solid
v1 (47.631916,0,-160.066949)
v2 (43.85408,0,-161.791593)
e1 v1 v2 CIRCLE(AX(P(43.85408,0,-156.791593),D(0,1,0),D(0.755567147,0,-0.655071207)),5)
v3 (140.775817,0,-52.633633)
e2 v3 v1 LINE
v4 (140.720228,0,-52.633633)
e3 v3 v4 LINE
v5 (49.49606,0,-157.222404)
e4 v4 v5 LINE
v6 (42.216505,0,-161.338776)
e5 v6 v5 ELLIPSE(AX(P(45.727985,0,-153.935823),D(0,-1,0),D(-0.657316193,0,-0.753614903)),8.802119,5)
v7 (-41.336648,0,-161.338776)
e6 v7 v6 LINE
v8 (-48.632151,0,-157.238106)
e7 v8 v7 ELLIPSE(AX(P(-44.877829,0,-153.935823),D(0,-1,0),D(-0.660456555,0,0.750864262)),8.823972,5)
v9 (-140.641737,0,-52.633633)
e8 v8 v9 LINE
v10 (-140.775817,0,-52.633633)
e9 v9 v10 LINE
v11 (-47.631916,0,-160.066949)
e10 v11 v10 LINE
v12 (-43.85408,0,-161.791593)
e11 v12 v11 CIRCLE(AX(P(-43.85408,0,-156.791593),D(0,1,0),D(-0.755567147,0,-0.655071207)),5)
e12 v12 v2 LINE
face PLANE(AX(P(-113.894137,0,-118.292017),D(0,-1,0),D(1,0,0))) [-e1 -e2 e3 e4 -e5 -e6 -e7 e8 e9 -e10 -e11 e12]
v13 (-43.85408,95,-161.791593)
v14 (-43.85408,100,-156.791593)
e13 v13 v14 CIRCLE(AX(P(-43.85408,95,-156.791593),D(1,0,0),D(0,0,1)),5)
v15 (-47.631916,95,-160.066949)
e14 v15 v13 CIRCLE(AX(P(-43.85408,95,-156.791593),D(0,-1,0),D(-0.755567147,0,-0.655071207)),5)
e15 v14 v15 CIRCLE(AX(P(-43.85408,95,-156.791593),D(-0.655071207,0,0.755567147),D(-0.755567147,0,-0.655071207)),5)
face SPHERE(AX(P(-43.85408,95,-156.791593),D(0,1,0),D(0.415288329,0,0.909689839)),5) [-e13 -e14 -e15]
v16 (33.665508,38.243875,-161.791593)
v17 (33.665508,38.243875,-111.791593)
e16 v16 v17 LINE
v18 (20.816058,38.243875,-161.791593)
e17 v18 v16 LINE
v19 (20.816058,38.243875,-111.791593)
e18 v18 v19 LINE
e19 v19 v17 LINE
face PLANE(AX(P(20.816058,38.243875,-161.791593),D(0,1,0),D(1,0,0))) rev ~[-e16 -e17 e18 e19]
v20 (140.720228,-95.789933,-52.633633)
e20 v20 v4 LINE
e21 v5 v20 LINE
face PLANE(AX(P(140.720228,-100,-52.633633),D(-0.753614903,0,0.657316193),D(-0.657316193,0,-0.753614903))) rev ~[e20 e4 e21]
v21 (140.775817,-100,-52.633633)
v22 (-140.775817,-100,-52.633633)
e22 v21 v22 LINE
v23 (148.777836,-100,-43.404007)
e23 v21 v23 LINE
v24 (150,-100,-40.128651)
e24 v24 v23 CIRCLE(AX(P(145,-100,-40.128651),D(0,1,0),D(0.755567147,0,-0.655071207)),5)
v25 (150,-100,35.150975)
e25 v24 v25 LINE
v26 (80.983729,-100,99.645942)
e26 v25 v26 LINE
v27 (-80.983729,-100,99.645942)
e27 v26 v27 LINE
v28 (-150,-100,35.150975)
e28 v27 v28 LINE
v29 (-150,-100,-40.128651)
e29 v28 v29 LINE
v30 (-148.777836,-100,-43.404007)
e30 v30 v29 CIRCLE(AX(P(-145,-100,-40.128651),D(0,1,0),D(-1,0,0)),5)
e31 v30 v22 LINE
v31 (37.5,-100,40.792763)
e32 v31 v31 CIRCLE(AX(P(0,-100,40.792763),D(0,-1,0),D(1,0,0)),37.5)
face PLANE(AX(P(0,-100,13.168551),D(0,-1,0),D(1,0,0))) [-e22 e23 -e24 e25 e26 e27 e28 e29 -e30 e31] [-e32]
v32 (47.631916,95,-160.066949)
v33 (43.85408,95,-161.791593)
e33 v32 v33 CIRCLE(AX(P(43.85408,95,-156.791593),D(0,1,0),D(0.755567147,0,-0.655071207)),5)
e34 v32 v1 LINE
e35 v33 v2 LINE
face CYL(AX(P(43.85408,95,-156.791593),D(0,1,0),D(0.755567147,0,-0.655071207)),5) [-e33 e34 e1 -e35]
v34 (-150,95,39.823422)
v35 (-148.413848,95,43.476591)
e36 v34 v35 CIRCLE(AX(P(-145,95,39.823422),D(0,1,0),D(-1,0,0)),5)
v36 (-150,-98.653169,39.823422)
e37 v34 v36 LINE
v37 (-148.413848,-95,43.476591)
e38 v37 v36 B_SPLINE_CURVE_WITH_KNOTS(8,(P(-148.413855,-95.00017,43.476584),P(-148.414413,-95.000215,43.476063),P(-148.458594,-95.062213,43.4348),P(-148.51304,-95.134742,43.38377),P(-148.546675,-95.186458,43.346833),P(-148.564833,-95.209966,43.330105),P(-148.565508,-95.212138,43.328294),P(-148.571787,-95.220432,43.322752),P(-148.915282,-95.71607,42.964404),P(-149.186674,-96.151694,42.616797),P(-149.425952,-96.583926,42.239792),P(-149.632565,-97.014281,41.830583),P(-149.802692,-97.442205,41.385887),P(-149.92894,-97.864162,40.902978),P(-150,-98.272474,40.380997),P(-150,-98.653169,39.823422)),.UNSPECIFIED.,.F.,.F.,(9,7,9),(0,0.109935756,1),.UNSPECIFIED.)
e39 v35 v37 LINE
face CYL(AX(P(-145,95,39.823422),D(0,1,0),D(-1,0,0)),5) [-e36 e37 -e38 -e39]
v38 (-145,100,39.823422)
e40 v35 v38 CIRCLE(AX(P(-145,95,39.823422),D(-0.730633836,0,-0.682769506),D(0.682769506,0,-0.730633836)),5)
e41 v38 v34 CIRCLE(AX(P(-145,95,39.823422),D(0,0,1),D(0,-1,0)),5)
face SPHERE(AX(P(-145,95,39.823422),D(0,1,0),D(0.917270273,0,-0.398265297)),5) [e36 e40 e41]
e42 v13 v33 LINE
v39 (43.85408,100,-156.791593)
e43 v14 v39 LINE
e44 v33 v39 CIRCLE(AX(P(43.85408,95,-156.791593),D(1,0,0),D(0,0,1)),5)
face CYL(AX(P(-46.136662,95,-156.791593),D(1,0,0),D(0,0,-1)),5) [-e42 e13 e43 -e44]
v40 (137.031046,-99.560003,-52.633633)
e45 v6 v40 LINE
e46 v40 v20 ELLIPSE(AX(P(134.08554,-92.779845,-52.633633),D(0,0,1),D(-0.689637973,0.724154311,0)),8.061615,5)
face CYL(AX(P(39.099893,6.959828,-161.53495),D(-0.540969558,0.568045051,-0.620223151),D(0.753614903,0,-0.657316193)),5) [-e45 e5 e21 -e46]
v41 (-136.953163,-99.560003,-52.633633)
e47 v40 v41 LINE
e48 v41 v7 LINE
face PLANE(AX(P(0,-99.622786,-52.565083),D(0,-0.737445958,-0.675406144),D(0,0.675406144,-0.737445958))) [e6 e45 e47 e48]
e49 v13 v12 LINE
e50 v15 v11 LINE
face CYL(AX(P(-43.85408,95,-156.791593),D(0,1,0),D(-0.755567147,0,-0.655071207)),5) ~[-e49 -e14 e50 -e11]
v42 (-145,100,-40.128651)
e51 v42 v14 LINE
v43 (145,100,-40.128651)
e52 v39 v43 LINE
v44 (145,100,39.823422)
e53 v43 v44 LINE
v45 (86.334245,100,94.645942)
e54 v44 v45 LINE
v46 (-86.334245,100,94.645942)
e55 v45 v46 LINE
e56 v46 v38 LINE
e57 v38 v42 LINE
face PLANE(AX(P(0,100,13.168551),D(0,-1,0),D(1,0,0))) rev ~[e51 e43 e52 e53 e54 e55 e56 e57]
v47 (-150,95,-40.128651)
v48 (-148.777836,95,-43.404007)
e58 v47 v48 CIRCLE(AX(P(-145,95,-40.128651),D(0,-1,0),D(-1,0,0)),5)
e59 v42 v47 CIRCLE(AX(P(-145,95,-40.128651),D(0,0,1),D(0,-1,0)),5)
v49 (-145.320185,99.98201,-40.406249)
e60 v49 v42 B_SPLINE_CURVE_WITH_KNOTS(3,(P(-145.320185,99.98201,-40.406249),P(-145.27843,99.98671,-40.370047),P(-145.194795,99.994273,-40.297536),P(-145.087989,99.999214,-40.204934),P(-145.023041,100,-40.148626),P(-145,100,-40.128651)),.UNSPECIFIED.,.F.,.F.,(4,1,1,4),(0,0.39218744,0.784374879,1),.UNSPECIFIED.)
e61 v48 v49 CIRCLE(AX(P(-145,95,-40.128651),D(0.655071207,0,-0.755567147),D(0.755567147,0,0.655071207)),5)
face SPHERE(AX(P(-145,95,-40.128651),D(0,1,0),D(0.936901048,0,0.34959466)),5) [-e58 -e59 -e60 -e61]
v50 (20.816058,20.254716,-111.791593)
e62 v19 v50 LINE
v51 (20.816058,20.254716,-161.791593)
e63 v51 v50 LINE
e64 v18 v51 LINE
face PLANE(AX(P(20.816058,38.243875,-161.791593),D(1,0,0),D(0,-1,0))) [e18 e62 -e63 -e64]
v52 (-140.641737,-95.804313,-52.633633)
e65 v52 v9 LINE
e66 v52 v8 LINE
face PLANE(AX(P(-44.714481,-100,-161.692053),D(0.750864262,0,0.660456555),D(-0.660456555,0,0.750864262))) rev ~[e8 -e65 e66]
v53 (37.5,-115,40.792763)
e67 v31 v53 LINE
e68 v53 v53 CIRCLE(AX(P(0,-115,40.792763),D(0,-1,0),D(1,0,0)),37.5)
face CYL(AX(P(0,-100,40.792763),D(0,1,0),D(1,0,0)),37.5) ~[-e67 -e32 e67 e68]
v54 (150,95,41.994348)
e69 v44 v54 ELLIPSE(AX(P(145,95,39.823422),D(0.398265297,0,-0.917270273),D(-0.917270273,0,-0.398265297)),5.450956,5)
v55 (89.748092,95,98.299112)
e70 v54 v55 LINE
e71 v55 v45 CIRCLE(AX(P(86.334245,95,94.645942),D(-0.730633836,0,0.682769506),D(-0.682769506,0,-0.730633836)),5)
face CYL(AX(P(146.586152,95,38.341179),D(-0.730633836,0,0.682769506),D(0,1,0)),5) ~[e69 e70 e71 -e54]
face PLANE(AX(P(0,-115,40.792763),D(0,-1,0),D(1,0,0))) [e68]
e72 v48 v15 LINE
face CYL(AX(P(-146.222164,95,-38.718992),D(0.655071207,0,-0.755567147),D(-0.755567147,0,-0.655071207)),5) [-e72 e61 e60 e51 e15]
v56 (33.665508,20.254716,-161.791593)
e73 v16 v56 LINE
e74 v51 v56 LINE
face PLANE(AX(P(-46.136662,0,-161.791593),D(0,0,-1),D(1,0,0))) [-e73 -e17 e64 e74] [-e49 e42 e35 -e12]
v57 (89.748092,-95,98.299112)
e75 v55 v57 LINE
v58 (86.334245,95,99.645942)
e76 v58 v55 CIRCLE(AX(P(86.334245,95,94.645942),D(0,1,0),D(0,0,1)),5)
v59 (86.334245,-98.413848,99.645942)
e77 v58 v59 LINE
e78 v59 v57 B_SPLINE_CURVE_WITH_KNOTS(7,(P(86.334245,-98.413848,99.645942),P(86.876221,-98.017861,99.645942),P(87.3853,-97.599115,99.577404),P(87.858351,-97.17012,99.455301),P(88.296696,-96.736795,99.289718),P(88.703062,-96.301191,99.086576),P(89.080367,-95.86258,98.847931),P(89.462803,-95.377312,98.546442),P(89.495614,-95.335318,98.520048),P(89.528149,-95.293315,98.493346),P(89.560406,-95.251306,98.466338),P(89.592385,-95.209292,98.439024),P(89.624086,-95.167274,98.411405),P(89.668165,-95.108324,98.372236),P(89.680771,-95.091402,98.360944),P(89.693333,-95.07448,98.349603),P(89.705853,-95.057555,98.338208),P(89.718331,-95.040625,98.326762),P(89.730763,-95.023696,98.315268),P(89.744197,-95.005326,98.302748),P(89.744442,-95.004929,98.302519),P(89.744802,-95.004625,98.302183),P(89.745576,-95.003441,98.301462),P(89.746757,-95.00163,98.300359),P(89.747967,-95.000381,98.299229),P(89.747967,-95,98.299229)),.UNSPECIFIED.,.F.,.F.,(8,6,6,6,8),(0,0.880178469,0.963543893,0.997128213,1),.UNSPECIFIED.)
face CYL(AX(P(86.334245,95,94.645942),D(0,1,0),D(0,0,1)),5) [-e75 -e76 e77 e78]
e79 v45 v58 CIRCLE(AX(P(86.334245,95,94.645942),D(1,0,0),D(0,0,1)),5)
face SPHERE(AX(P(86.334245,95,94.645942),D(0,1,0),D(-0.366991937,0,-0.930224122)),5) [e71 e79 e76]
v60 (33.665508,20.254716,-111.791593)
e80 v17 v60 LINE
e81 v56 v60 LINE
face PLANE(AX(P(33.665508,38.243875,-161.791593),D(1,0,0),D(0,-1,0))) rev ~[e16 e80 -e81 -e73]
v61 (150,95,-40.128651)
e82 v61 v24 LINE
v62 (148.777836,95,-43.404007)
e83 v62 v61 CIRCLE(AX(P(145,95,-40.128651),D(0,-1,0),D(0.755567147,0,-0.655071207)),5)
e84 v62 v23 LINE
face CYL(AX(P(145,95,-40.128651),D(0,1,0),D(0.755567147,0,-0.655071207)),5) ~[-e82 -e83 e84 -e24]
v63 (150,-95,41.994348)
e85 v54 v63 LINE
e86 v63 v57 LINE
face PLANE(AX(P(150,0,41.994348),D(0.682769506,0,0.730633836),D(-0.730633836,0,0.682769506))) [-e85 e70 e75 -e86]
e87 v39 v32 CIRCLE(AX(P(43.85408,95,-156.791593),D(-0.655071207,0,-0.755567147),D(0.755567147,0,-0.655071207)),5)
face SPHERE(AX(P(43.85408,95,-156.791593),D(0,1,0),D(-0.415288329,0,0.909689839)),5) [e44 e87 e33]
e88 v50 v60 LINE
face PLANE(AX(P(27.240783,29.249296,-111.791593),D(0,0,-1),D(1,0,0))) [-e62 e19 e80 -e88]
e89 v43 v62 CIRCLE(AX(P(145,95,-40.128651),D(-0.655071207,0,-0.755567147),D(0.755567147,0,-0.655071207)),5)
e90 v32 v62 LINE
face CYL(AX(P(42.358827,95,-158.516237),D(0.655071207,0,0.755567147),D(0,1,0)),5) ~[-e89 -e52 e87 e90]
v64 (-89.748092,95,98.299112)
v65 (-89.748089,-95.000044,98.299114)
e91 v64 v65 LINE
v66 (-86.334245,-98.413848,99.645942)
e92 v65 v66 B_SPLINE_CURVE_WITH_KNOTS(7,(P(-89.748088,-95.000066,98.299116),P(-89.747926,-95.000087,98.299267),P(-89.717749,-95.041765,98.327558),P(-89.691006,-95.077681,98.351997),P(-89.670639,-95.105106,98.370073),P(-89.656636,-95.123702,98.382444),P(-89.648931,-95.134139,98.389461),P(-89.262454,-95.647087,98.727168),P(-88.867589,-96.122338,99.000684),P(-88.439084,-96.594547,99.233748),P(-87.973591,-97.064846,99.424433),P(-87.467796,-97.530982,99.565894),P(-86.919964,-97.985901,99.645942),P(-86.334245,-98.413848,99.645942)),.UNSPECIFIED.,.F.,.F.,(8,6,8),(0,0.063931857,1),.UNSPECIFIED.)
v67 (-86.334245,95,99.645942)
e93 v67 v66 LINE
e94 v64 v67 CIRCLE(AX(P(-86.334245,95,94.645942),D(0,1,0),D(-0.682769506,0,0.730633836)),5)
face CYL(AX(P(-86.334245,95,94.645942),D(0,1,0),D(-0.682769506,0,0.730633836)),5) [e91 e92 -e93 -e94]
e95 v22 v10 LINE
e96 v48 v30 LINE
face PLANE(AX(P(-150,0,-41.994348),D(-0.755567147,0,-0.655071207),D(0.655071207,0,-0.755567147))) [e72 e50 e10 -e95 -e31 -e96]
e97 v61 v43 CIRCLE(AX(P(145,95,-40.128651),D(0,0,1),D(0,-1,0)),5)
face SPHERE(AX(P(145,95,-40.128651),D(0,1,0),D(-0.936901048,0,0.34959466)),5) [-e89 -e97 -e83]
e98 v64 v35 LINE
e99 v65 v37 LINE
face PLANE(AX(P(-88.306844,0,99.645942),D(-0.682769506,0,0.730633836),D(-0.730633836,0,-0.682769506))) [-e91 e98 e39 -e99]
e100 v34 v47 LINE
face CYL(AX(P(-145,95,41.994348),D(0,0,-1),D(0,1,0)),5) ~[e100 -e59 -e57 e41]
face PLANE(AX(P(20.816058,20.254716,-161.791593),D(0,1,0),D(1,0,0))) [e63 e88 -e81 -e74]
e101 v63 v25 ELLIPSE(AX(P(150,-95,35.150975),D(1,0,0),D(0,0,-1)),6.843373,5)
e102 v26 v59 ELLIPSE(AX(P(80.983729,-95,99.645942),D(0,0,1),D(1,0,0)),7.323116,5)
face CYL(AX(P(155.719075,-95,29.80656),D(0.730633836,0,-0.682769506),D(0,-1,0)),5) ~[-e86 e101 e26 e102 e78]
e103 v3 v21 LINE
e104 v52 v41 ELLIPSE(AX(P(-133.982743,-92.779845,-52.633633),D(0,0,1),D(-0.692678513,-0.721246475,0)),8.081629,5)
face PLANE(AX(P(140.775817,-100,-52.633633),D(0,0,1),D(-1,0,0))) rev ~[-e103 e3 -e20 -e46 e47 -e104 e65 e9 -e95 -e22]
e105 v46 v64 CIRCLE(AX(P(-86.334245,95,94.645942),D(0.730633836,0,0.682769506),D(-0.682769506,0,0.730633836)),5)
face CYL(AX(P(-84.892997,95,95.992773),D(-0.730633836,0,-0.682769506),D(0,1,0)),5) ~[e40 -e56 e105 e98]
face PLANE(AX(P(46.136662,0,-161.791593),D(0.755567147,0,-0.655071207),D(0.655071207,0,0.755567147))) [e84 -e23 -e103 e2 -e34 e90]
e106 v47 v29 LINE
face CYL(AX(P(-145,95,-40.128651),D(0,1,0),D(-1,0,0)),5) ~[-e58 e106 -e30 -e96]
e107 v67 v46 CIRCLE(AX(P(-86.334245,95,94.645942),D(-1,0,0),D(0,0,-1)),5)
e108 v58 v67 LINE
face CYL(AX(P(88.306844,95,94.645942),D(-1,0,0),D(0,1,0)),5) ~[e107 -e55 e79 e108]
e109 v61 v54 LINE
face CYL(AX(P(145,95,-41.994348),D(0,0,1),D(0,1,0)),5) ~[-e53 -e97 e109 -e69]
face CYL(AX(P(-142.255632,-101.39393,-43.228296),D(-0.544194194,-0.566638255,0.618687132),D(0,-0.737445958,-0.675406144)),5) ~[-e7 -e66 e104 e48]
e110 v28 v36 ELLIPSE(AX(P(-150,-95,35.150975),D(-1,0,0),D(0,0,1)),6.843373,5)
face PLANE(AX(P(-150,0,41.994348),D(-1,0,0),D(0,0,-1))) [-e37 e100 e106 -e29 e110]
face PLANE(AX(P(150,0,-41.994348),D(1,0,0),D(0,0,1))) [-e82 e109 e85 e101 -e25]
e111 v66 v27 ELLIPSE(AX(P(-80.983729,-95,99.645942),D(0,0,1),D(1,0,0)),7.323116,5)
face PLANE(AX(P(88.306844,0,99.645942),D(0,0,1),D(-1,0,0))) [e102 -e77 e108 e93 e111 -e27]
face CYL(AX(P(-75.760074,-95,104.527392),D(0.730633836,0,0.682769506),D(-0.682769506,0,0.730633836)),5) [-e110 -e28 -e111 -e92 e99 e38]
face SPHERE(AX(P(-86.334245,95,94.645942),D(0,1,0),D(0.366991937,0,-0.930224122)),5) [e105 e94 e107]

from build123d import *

# Parameters (mm, degrees)
F0_W          = 92.273324728
F0_H          = 57.6515942812
F0_W_2        = 42.1701818705
F0_H_2        = 26.3371020555
F0_H_3        = 119.797244668
F0_H_4        = 35.8085483313
F1_DEPTH      = 100
F1_DEPTH_BACK = 100
F3_DEPTH      = 100
F5_DEPTH      = 150
F5_DEPTH_BACK = 150
F7_DEPTH      = 100
F8_R          = 5
F9_T1_DEPTH   = 199.6642420397
F9_T3_DEPTH   = 100.7064549822
F9_T5_DEPTH   = 109.4378575727
F9_T7_DEPTH   = 199.9314988793
F9_T9_DEPTH   = 109.4378575727
F9_T11_DEPTH  = 200.4273166446
F9_T16_DEPTH  = 5.1
F9_T22_DEPTH  = 5.1
F9_T28_DEPTH  = 5.1
F9_T34_DEPTH  = 5.1
F9_T40_DEPTH  = 5.1
F9_T46_DEPTH  = 5.1
F9_T52_DEPTH  = 5.1
F9_T58_DEPTH  = 190.7815844726
F9_T64_DEPTH  = 191.1757464634
F10_R         = 37.5
F11_DEPTH     = 15
F12_W         = 12.8494501114
F12_H         = 17.9891586304
F13_DEPTH     = 50


# Not quite as in the source:
# - a fillet or chamfer that OpenCascade refuses, or shapes differently, is made with other operations: its cross-section is extruded or revolved along the edge and cut away or added


with BuildPart() as f1:
    # F0 (on Front) → F1 (new body, two sides)
    with BuildSketch(Plane.XZ) as f1_sk:
        with Locations((0, 13.1685510278)):
            Rectangle(F0_W, F0_H)
        with Locations((-67.2217532992, 13.1685510278)):
            Rectangle(F0_W_2, F0_H)
        Polygon((-150, 41.9943481684), (-150, -41.9943481684), (-46.136662364, -41.9943481684), (-46.136662364, -15.6572461128), (-88.3068442345, -15.6572461128), (-88.3068442345, 41.9943481684), align=None)
        with Locations((0, -28.8257971406)):
            Rectangle(F0_W, F0_H_2)
        Polygon((46.136662364, -15.6572461128), (46.136662364, -41.9943481684), (150, -41.9943481684), (150, 41.9943481684), (88.3068442345, 41.9943481684), (88.3068442345, -15.6572461128), align=None)
        with Locations((67.2217532992, 13.1685510278)):
            Rectangle(F0_W_2, F0_H)
        Polygon((-46.136662364, -41.9943481684), (-150, -41.9943481684), (-46.136662364, -161.7915928364), align=None)
        with Locations((0, -101.8929705024)):
            Rectangle(F0_W, F0_H_3)
        Polygon((150, -41.9943481684), (46.136662364, -41.9943481684), (46.136662364, -161.7915928364), align=None)
        Polygon((-88.3068442345, 99.6459424496), (-88.3068442345, 41.9943481684), (-46.136662364, 41.9943481684), (-46.136662364, 77.8028964996), (46.136662364, 77.8028964996), (46.136662364, 41.9943481684), (88.3068442345, 41.9943481684), (88.3068442345, 99.6459424496), align=None)
        with Locations((0, 59.898622334)):
            Rectangle(F0_W, F0_H_4)
        Polygon((-88.3068442345, 99.6459424496), (-150, 41.9943481684), (-88.3068442345, 41.9943481684), align=None)
        Polygon((150, 41.9943481684), (88.3068442345, 99.6459424496), (88.3068442345, 41.9943481684), align=None)
    extrude(amount=F1_DEPTH)
    extrude(f1_sk.sketch, amount=-F1_DEPTH_BACK)

    # F2 (on face) → F3 (cut)
    with BuildSketch(Plane.XZ.offset(100)):
        Polygon((140.7758174747, -52.633633175), (-140.7758174747, -52.633633175), (-46.136662364, -161.7915928364), (46.136662364, -161.7915928364), align=None)
    extrude(amount=-F3_DEPTH, mode=Mode.SUBTRACT)

    # F4 (on Right) → F5 (join, two sides)
    with BuildSketch(Plane.YZ) as f5_sk:
        Polygon((-99.6227860451, -52.5650829077), (0, -161.33877635), (0, -52.5650829077), align=None)
    extrude(amount=F5_DEPTH)
    extrude(f5_sk.sketch, amount=-F5_DEPTH_BACK)

    # F6 (on face) → F7 (cut)
    with BuildSketch(Plane.XZ.offset(100)):
        Polygon((-140.7758174747, -52.633633175), (-150, -41.9943481684), (-150.5579352379, -161.6920530796), (-44.7144806385, -161.6920530796), (-140.6417366282, -52.633633175), align=None)
        Polygon((140.7758174747, -52.633633175), (140.7202282019, -52.633633175), (45.5975532532, -161.6920530796), (150, -161.6920530796), (150, -41.9943481684), align=None)
    extrude(amount=-F7_DEPTH, mode=Mode.SUBTRACT)

    # F8
    f8_edges = [f1.edges().sort_by_distance(p)[0] for p in [
        (0, 100, 99.645942),
        (119.153422, 100, 70.820145),
        (-150, 100, 0),
        (-98.068331, 100, -101.892971),
        (0, 100, -161.791593),
        (98.068331, 100, -101.892971),
        (150, 100, 0),
        (-119.153422, 100, 70.820145),
    ]]
    fillet(f8_edges, radius=F8_R)

    # F9: fillet of radius 5 on 11 edges, made by hand

    # F9_s2 → F9_t1 (cut)
    with BuildSketch(Plane.XZ.offset(-95)):
        with BuildLine():
            ThreePointArc((148.7778357345, -43.4040073885), (149.6845052392, -41.8766246542), (150, -40.1286513525))
            Line((150, -40.1286513525), (150, -41.9943481684))
            Line((150, -41.9943481684), (148.7778357345, -43.4040073885))
        make_face()
        with BuildLine():
            ThreePointArc((-150, -40.1286513525), (-149.6845052392, -41.8766246542), (-148.7778357345, -43.4040073885))
            Line((-148.7778357345, -43.4040073885), (-150, -41.9943481684))
            Line((-150, -41.9943481684), (-150, -40.1286513525))
        make_face()
    extrude(amount=F9_T1_DEPTH, mode=Mode.SUBTRACT)

    # F9_s4 → F9_t3 (cut)
    with BuildSketch(Plane.XZ.offset(-95)):
        with BuildLine():
            ThreePointArc((47.6319161056, -160.0669488724), (45.9305220173, -161.3400420326), (43.8540803711, -161.7915928364))
            Line((43.8540803711, -161.7915928364), (46.136662364, -161.7915928364))
            Line((46.136662364, -161.7915928364), (47.6319161056, -160.0669488724))
        make_face()
        with BuildLine():
            ThreePointArc((-47.6319161056, -160.0669488724), (-45.9305220173, -161.3400420326), (-43.8540803711, -161.7915928364))
            Line((-43.8540803711, -161.7915928364), (-46.136662364, -161.7915928364))
            Line((-46.136662364, -161.7915928364), (-47.6319161056, -160.0669488724))
        make_face()
    extrude(amount=F9_T3_DEPTH, mode=Mode.SUBTRACT)

    # F9_s6 → F9_t5 (cut)
    with BuildSketch(Plane(origin=(68.2577235686, 0, -63.786112688), x_dir=(0, 1, 0), z_dir=(-0.7306338358, 0, 0.6827695057))):
        with BuildLine():
            ThreePointArc((-100, -128.0979175463), (-98.5355339059, -131.6334514522), (-95, -133.0979175463))
            Line((-95, -133.0979175463), (-100, -133.0979175463))
            Line((-100, -133.0979175463), (-100, -128.0979175463))
        make_face()
    extrude(amount=F9_T5_DEPTH, mode=Mode.SUBTRACT)

    # F9_s8 → F9_t7 (cut)
    with BuildSketch(Plane.XZ.offset(-95)):
        with BuildLine():
            ThreePointArc((86.3342446827, 99.6459424496), (88.1692043696, 99.2970630616), (89.7480922115, 98.2991116286))
            Line((89.7480922115, 98.2991116286), (88.3068442345, 99.6459424496))
            Line((88.3068442345, 99.6459424496), (86.3342446827, 99.6459424496))
        make_face()
        with BuildLine():
            ThreePointArc((-89.7480922115, 98.2991116286), (-88.1692043696, 99.2970630616), (-86.3342446827, 99.6459424496))
            Line((-86.3342446827, 99.6459424496), (-88.3068442345, 99.6459424496))
            Line((-88.3068442345, 99.6459424496), (-89.7480922115, 98.2991116286))
        make_face()
    extrude(amount=F9_T7_DEPTH, mode=Mode.SUBTRACT)

    # F9_s10 → F9_t9 (cut)
    with BuildSketch(Plane(origin=(11.701278092, 0, 10.9347192369), x_dir=(0, 1, 0), z_dir=(-0.7306338358, 0, -0.6827695057))):
        with BuildLine():
            ThreePointArc((-95, -133.0979175463), (-98.5355339059, -131.6334514522), (-100, -128.0979175463))
            Line((-100, -128.0979175463), (-100, -133.0979175463))
            Line((-100, -133.0979175463), (-95, -133.0979175463))
        make_face()
    extrude(amount=F9_T9_DEPTH, mode=Mode.SUBTRACT)

    # F9_s12 → F9_t11 (cut)
    with BuildSketch(Plane.XZ.offset(-95)):
        with BuildLine():
            ThreePointArc((-150, 39.8234215105), (-149.5863513627, 41.8147479976), (-148.4138475287, 43.4765906896))
            Line((-148.4138475287, 43.4765906896), (-150, 41.9943481684))
            Line((-150, 41.9943481684), (-150, 39.8234215105))
        make_face()
    extrude(amount=F9_T11_DEPTH, mode=Mode.SUBTRACT)


with BuildPart() as f9_tool14:
    # F9_s15 → F9_t16 (new body)
    with BuildSketch(Plane.XZ.offset(-95)):
        Polygon((-43.8540803711, -156.7915928364), (-47.7074728203, -160.1324559932), (-46.1823140039, -161.8915928364), (-43.8540803711, -161.8915928364), align=None)
    extrude(amount=-F9_T16_DEPTH)

    # F9_s17 → F9_t18 (revolve, cut)
    with BuildSketch(Plane(origin=(-43.8540803711, 95, -156.7915928364), x_dir=(0.4152883292, 0, 0.9096898392), z_dir=(-0.9096898392, 0, 0.4152883292))):
        with BuildLine():
            ThreePointArc((0, -5), (5, 0), (0, 5))
            Line((0, 5), (0, -5))
        make_face()
    revolve(axis=Axis((-43.8540803711, 95, -156.7915928364), (0, 1, 0)), mode=Mode.SUBTRACT)


with BuildPart() as f1_1:
    add(f1.part)

    # F9_t13: cut F9_tool14
    add(f9_tool14.part, mode=Mode.SUBTRACT)


with BuildPart() as f9_tool20:
    # F9_s21 → F9_t22 (new body)
    with BuildSketch(Plane.XZ.offset(-95)):
        Polygon((-145, -40.1286513525), (-150.1, -40.1286513525), (-150.1, -42.0316621047), (-148.8533924492, -43.4695145093), align=None)
    extrude(amount=-F9_T22_DEPTH)

    # F9_s23 → F9_t24 (revolve, cut)
    with BuildSketch(Plane(origin=(-145, 95, -40.1286513525), x_dir=(0.9369010478, 0, 0.3495946604), z_dir=(-0.3495946604, 0, 0.9369010478))):
        with BuildLine():
            ThreePointArc((0, -5), (5, 0), (0, 5))
            Line((0, 5), (0, -5))
        make_face()
    revolve(axis=Axis((-145, 95, -40.1286513525), (0, 1, 0)), mode=Mode.SUBTRACT)


with BuildPart() as f1_2:
    add(f1_1.part)

    # F9_t19: cut F9_tool20
    add(f9_tool20.part, mode=Mode.SUBTRACT)


with BuildPart() as f9_tool26:
    # F9_s27 → F9_t28 (new body)
    with BuildSketch(Plane.XZ.offset(-95)):
        Polygon((-145, 39.8234215105), (-150.1, 39.8234215105), (-150.1, 42.0377667015), (-148.4821244793, 43.5496540731), align=None)
    extrude(amount=-F9_T28_DEPTH)

    # F9_s29 → F9_t30 (revolve, cut)
    with BuildSketch(Plane(origin=(-145, 95, 39.8234215105), x_dir=(0.9172702725, 0, -0.3982652974), z_dir=(0.3982652974, 0, 0.9172702725))):
        with BuildLine():
            ThreePointArc((0, -5), (5, 0), (0, 5))
            Line((0, 5), (0, -5))
        make_face()
    revolve(axis=Axis((-145, 95, 39.8234215105), (0, 1, 0)), mode=Mode.SUBTRACT)


with BuildPart() as f1_3:
    add(f1_2.part)

    # F9_t25: cut F9_tool26
    add(f9_tool26.part, mode=Mode.SUBTRACT)


with BuildPart() as f9_tool32:
    # F9_s33 → F9_t34 (new body)
    with BuildSketch(Plane.XZ.offset(-95)):
        Polygon((-86.3342446827, 94.6459424496), (-89.816369162, 98.3721750122), (-88.3462962255, 99.7459424496), (-86.3342446827, 99.7459424496), align=None)
    extrude(amount=-F9_T34_DEPTH)

    # F9_s35 → F9_t36 (revolve, cut)
    with BuildSketch(Plane(origin=(-86.3342446827, 95, 94.6459424496), x_dir=(0.3669919374, 0, -0.9302241224), z_dir=(0.9302241224, 0, 0.3669919374))):
        with BuildLine():
            ThreePointArc((0, -5), (5, 0), (0, 5))
            Line((0, 5), (0, -5))
        make_face()
    revolve(axis=Axis((-86.3342446827, 95, 94.6459424496), (0, 1, 0)), mode=Mode.SUBTRACT)


with BuildPart() as f1_4:
    add(f1_3.part)

    # F9_t31: cut F9_tool32
    add(f9_tool32.part, mode=Mode.SUBTRACT)


with BuildPart() as f9_tool38:
    # F9_s39 → F9_t40 (new body)
    with BuildSketch(Plane.XZ.offset(-95)):
        Polygon((86.3342446827, 94.6459424496), (86.3342446827, 99.7459424496), (88.3462962255, 99.7459424496), (89.816369162, 98.3721750122), align=None)
    extrude(amount=-F9_T40_DEPTH)

    # F9_s41 → F9_t42 (revolve, cut)
    with BuildSketch(Plane(origin=(86.3342446827, 95, 94.6459424496), x_dir=(-0.3669919374, 0, -0.9302241224), z_dir=(0.9302241224, 0, -0.3669919374))):
        with BuildLine():
            ThreePointArc((0, -5), (5, 0), (0, 5))
            Line((0, 5), (0, -5))
        make_face()
    revolve(axis=Axis((86.3342446827, 95, 94.6459424496), (0, 1, 0)), mode=Mode.SUBTRACT)


with BuildPart() as f1_5:
    add(f1_4.part)

    # F9_t37: cut F9_tool38
    add(f9_tool38.part, mode=Mode.SUBTRACT)


with BuildPart() as f9_tool44:
    # F9_s45 → F9_t46 (new body)
    with BuildSketch(Plane.XZ.offset(-95)):
        Polygon((43.8540803711, -156.7915928364), (47.7074728203, -160.1324559932), (46.1823140039, -161.8915928364), (43.8540803711, -161.8915928364), align=None)
    extrude(amount=-F9_T46_DEPTH)

    # F9_s47 → F9_t48 (revolve, cut)
    with BuildSketch(Plane(origin=(43.8540803711, 95, -156.7915928364), x_dir=(-0.4152883292, 0, 0.9096898392), z_dir=(-0.9096898392, 0, -0.4152883292))):
        with BuildLine():
            ThreePointArc((0, -5), (5, 0), (0, 5))
            Line((0, 5), (0, -5))
        make_face()
    revolve(axis=Axis((43.8540803711, 95, -156.7915928364), (0, 1, 0)), mode=Mode.SUBTRACT)


with BuildPart() as f1_6:
    add(f1_5.part)

    # F9_t43: cut F9_tool44
    add(f9_tool44.part, mode=Mode.SUBTRACT)


with BuildPart() as f9_tool50:
    # F9_s51 → F9_t52 (new body)
    with BuildSketch(Plane.XZ.offset(-95)):
        Polygon((145, -40.1286513525), (148.8533924492, -43.4695145093), (150.1, -42.0316621047), (150.1, -40.1286513525), align=None)
    extrude(amount=-F9_T52_DEPTH)

    # F9_s53 → F9_t54 (revolve, cut)
    with BuildSketch(Plane(origin=(145, 95, -40.1286513525), x_dir=(-0.9369010478, 0, 0.3495946604), z_dir=(-0.3495946604, 0, -0.9369010478))):
        with BuildLine():
            ThreePointArc((0, -5), (5, 0), (0, 5))
            Line((0, 5), (0, -5))
        make_face()
    revolve(axis=Axis((145, 95, -40.1286513525), (0, 1, 0)), mode=Mode.SUBTRACT)


with BuildPart() as f1_7:
    add(f1_6.part)

    # F9_t49: cut F9_tool50
    add(f9_tool50.part, mode=Mode.SUBTRACT)


with BuildPart() as f9_tool56:
    # F9_s57 → F9_t58 (new body)
    with BuildSketch(Plane(origin=(-44.8947175454, 47.1416954329, -51.4719225484), x_dir=(0.7241543113, 0.6896379727, 0), z_dir=(0.5409695578, -0.5680450514, 0.6202231511))):
        with BuildLine():
            ThreePointArc((35.8427850372, -144.5001725374), (33.2234593548, -145.3091827818), (30.5712639561, -144.6154795512))
            Line((30.5712639561, -144.6154795512), (33.2428014748, -146.1934515657))
            Line((33.2428014748, -146.1934515657), (35.8427850372, -144.5001725374))
        make_face()
    extrude(amount=F9_T58_DEPTH)

    split(bisect_by=Plane.XY.offset(-52.633633175), keep=Keep.BOTTOM)

    split(bisect_by=Plane.XZ, keep=Keep.TOP)


with BuildPart() as f1_8:
    add(f1_7.part)

    # F9_t55: cut F9_tool56
    add(f9_tool56.part, mode=Mode.SUBTRACT)


with BuildPart() as f9_tool62:
    # F9_s63 → F9_t64 (new body)
    with BuildSketch(Plane(origin=(-58.840223556, -61.2669557127, 66.8946666059), x_dir=(-0.7212464746, 0.6926785134, 0), z_dir=(0.544194194, 0.5666382547, -0.6186871323))):
        with BuildLine():
            ThreePointArc((29.8139114642, -144.4686613021), (32.4583698037, -145.1693847909), (35.0757673211, -144.3735182485))
            Line((35.0757673211, -144.3735182485), (32.4742820088, -146.0494041555))
            Line((32.4742820088, -146.0494041555), (29.8139114642, -144.4686613021))
        make_face()
    extrude(amount=F9_T64_DEPTH)

    split(bisect_by=Plane.XY.offset(-52.633633175), keep=Keep.BOTTOM)

    split(bisect_by=Plane.XZ, keep=Keep.TOP)


with BuildPart() as f1_9:
    add(f1_8.part)

    # F9_t61: cut F9_tool62
    add(f9_tool62.part, mode=Mode.SUBTRACT)

    # F10 (on face) → F11 (join)
    with BuildSketch(Plane.XZ.offset(100)):
        with Locations((0, 40.7927632332)):
            Circle(F10_R)
    extrude(amount=F11_DEPTH)

    # F12 (on face) → F13 (cut)
    with BuildSketch(Plane(origin=(0, 0, -161.7915928364), x_dir=(1, 0, 0), z_dir=(0, 0, -1))):
        with Locations((27.2407829762, -29.2492955923)):
            Rectangle(F12_W, F12_H)
    extrude(amount=-F13_DEPTH, mode=Mode.SUBTRACT)


solid = f1_9.part
